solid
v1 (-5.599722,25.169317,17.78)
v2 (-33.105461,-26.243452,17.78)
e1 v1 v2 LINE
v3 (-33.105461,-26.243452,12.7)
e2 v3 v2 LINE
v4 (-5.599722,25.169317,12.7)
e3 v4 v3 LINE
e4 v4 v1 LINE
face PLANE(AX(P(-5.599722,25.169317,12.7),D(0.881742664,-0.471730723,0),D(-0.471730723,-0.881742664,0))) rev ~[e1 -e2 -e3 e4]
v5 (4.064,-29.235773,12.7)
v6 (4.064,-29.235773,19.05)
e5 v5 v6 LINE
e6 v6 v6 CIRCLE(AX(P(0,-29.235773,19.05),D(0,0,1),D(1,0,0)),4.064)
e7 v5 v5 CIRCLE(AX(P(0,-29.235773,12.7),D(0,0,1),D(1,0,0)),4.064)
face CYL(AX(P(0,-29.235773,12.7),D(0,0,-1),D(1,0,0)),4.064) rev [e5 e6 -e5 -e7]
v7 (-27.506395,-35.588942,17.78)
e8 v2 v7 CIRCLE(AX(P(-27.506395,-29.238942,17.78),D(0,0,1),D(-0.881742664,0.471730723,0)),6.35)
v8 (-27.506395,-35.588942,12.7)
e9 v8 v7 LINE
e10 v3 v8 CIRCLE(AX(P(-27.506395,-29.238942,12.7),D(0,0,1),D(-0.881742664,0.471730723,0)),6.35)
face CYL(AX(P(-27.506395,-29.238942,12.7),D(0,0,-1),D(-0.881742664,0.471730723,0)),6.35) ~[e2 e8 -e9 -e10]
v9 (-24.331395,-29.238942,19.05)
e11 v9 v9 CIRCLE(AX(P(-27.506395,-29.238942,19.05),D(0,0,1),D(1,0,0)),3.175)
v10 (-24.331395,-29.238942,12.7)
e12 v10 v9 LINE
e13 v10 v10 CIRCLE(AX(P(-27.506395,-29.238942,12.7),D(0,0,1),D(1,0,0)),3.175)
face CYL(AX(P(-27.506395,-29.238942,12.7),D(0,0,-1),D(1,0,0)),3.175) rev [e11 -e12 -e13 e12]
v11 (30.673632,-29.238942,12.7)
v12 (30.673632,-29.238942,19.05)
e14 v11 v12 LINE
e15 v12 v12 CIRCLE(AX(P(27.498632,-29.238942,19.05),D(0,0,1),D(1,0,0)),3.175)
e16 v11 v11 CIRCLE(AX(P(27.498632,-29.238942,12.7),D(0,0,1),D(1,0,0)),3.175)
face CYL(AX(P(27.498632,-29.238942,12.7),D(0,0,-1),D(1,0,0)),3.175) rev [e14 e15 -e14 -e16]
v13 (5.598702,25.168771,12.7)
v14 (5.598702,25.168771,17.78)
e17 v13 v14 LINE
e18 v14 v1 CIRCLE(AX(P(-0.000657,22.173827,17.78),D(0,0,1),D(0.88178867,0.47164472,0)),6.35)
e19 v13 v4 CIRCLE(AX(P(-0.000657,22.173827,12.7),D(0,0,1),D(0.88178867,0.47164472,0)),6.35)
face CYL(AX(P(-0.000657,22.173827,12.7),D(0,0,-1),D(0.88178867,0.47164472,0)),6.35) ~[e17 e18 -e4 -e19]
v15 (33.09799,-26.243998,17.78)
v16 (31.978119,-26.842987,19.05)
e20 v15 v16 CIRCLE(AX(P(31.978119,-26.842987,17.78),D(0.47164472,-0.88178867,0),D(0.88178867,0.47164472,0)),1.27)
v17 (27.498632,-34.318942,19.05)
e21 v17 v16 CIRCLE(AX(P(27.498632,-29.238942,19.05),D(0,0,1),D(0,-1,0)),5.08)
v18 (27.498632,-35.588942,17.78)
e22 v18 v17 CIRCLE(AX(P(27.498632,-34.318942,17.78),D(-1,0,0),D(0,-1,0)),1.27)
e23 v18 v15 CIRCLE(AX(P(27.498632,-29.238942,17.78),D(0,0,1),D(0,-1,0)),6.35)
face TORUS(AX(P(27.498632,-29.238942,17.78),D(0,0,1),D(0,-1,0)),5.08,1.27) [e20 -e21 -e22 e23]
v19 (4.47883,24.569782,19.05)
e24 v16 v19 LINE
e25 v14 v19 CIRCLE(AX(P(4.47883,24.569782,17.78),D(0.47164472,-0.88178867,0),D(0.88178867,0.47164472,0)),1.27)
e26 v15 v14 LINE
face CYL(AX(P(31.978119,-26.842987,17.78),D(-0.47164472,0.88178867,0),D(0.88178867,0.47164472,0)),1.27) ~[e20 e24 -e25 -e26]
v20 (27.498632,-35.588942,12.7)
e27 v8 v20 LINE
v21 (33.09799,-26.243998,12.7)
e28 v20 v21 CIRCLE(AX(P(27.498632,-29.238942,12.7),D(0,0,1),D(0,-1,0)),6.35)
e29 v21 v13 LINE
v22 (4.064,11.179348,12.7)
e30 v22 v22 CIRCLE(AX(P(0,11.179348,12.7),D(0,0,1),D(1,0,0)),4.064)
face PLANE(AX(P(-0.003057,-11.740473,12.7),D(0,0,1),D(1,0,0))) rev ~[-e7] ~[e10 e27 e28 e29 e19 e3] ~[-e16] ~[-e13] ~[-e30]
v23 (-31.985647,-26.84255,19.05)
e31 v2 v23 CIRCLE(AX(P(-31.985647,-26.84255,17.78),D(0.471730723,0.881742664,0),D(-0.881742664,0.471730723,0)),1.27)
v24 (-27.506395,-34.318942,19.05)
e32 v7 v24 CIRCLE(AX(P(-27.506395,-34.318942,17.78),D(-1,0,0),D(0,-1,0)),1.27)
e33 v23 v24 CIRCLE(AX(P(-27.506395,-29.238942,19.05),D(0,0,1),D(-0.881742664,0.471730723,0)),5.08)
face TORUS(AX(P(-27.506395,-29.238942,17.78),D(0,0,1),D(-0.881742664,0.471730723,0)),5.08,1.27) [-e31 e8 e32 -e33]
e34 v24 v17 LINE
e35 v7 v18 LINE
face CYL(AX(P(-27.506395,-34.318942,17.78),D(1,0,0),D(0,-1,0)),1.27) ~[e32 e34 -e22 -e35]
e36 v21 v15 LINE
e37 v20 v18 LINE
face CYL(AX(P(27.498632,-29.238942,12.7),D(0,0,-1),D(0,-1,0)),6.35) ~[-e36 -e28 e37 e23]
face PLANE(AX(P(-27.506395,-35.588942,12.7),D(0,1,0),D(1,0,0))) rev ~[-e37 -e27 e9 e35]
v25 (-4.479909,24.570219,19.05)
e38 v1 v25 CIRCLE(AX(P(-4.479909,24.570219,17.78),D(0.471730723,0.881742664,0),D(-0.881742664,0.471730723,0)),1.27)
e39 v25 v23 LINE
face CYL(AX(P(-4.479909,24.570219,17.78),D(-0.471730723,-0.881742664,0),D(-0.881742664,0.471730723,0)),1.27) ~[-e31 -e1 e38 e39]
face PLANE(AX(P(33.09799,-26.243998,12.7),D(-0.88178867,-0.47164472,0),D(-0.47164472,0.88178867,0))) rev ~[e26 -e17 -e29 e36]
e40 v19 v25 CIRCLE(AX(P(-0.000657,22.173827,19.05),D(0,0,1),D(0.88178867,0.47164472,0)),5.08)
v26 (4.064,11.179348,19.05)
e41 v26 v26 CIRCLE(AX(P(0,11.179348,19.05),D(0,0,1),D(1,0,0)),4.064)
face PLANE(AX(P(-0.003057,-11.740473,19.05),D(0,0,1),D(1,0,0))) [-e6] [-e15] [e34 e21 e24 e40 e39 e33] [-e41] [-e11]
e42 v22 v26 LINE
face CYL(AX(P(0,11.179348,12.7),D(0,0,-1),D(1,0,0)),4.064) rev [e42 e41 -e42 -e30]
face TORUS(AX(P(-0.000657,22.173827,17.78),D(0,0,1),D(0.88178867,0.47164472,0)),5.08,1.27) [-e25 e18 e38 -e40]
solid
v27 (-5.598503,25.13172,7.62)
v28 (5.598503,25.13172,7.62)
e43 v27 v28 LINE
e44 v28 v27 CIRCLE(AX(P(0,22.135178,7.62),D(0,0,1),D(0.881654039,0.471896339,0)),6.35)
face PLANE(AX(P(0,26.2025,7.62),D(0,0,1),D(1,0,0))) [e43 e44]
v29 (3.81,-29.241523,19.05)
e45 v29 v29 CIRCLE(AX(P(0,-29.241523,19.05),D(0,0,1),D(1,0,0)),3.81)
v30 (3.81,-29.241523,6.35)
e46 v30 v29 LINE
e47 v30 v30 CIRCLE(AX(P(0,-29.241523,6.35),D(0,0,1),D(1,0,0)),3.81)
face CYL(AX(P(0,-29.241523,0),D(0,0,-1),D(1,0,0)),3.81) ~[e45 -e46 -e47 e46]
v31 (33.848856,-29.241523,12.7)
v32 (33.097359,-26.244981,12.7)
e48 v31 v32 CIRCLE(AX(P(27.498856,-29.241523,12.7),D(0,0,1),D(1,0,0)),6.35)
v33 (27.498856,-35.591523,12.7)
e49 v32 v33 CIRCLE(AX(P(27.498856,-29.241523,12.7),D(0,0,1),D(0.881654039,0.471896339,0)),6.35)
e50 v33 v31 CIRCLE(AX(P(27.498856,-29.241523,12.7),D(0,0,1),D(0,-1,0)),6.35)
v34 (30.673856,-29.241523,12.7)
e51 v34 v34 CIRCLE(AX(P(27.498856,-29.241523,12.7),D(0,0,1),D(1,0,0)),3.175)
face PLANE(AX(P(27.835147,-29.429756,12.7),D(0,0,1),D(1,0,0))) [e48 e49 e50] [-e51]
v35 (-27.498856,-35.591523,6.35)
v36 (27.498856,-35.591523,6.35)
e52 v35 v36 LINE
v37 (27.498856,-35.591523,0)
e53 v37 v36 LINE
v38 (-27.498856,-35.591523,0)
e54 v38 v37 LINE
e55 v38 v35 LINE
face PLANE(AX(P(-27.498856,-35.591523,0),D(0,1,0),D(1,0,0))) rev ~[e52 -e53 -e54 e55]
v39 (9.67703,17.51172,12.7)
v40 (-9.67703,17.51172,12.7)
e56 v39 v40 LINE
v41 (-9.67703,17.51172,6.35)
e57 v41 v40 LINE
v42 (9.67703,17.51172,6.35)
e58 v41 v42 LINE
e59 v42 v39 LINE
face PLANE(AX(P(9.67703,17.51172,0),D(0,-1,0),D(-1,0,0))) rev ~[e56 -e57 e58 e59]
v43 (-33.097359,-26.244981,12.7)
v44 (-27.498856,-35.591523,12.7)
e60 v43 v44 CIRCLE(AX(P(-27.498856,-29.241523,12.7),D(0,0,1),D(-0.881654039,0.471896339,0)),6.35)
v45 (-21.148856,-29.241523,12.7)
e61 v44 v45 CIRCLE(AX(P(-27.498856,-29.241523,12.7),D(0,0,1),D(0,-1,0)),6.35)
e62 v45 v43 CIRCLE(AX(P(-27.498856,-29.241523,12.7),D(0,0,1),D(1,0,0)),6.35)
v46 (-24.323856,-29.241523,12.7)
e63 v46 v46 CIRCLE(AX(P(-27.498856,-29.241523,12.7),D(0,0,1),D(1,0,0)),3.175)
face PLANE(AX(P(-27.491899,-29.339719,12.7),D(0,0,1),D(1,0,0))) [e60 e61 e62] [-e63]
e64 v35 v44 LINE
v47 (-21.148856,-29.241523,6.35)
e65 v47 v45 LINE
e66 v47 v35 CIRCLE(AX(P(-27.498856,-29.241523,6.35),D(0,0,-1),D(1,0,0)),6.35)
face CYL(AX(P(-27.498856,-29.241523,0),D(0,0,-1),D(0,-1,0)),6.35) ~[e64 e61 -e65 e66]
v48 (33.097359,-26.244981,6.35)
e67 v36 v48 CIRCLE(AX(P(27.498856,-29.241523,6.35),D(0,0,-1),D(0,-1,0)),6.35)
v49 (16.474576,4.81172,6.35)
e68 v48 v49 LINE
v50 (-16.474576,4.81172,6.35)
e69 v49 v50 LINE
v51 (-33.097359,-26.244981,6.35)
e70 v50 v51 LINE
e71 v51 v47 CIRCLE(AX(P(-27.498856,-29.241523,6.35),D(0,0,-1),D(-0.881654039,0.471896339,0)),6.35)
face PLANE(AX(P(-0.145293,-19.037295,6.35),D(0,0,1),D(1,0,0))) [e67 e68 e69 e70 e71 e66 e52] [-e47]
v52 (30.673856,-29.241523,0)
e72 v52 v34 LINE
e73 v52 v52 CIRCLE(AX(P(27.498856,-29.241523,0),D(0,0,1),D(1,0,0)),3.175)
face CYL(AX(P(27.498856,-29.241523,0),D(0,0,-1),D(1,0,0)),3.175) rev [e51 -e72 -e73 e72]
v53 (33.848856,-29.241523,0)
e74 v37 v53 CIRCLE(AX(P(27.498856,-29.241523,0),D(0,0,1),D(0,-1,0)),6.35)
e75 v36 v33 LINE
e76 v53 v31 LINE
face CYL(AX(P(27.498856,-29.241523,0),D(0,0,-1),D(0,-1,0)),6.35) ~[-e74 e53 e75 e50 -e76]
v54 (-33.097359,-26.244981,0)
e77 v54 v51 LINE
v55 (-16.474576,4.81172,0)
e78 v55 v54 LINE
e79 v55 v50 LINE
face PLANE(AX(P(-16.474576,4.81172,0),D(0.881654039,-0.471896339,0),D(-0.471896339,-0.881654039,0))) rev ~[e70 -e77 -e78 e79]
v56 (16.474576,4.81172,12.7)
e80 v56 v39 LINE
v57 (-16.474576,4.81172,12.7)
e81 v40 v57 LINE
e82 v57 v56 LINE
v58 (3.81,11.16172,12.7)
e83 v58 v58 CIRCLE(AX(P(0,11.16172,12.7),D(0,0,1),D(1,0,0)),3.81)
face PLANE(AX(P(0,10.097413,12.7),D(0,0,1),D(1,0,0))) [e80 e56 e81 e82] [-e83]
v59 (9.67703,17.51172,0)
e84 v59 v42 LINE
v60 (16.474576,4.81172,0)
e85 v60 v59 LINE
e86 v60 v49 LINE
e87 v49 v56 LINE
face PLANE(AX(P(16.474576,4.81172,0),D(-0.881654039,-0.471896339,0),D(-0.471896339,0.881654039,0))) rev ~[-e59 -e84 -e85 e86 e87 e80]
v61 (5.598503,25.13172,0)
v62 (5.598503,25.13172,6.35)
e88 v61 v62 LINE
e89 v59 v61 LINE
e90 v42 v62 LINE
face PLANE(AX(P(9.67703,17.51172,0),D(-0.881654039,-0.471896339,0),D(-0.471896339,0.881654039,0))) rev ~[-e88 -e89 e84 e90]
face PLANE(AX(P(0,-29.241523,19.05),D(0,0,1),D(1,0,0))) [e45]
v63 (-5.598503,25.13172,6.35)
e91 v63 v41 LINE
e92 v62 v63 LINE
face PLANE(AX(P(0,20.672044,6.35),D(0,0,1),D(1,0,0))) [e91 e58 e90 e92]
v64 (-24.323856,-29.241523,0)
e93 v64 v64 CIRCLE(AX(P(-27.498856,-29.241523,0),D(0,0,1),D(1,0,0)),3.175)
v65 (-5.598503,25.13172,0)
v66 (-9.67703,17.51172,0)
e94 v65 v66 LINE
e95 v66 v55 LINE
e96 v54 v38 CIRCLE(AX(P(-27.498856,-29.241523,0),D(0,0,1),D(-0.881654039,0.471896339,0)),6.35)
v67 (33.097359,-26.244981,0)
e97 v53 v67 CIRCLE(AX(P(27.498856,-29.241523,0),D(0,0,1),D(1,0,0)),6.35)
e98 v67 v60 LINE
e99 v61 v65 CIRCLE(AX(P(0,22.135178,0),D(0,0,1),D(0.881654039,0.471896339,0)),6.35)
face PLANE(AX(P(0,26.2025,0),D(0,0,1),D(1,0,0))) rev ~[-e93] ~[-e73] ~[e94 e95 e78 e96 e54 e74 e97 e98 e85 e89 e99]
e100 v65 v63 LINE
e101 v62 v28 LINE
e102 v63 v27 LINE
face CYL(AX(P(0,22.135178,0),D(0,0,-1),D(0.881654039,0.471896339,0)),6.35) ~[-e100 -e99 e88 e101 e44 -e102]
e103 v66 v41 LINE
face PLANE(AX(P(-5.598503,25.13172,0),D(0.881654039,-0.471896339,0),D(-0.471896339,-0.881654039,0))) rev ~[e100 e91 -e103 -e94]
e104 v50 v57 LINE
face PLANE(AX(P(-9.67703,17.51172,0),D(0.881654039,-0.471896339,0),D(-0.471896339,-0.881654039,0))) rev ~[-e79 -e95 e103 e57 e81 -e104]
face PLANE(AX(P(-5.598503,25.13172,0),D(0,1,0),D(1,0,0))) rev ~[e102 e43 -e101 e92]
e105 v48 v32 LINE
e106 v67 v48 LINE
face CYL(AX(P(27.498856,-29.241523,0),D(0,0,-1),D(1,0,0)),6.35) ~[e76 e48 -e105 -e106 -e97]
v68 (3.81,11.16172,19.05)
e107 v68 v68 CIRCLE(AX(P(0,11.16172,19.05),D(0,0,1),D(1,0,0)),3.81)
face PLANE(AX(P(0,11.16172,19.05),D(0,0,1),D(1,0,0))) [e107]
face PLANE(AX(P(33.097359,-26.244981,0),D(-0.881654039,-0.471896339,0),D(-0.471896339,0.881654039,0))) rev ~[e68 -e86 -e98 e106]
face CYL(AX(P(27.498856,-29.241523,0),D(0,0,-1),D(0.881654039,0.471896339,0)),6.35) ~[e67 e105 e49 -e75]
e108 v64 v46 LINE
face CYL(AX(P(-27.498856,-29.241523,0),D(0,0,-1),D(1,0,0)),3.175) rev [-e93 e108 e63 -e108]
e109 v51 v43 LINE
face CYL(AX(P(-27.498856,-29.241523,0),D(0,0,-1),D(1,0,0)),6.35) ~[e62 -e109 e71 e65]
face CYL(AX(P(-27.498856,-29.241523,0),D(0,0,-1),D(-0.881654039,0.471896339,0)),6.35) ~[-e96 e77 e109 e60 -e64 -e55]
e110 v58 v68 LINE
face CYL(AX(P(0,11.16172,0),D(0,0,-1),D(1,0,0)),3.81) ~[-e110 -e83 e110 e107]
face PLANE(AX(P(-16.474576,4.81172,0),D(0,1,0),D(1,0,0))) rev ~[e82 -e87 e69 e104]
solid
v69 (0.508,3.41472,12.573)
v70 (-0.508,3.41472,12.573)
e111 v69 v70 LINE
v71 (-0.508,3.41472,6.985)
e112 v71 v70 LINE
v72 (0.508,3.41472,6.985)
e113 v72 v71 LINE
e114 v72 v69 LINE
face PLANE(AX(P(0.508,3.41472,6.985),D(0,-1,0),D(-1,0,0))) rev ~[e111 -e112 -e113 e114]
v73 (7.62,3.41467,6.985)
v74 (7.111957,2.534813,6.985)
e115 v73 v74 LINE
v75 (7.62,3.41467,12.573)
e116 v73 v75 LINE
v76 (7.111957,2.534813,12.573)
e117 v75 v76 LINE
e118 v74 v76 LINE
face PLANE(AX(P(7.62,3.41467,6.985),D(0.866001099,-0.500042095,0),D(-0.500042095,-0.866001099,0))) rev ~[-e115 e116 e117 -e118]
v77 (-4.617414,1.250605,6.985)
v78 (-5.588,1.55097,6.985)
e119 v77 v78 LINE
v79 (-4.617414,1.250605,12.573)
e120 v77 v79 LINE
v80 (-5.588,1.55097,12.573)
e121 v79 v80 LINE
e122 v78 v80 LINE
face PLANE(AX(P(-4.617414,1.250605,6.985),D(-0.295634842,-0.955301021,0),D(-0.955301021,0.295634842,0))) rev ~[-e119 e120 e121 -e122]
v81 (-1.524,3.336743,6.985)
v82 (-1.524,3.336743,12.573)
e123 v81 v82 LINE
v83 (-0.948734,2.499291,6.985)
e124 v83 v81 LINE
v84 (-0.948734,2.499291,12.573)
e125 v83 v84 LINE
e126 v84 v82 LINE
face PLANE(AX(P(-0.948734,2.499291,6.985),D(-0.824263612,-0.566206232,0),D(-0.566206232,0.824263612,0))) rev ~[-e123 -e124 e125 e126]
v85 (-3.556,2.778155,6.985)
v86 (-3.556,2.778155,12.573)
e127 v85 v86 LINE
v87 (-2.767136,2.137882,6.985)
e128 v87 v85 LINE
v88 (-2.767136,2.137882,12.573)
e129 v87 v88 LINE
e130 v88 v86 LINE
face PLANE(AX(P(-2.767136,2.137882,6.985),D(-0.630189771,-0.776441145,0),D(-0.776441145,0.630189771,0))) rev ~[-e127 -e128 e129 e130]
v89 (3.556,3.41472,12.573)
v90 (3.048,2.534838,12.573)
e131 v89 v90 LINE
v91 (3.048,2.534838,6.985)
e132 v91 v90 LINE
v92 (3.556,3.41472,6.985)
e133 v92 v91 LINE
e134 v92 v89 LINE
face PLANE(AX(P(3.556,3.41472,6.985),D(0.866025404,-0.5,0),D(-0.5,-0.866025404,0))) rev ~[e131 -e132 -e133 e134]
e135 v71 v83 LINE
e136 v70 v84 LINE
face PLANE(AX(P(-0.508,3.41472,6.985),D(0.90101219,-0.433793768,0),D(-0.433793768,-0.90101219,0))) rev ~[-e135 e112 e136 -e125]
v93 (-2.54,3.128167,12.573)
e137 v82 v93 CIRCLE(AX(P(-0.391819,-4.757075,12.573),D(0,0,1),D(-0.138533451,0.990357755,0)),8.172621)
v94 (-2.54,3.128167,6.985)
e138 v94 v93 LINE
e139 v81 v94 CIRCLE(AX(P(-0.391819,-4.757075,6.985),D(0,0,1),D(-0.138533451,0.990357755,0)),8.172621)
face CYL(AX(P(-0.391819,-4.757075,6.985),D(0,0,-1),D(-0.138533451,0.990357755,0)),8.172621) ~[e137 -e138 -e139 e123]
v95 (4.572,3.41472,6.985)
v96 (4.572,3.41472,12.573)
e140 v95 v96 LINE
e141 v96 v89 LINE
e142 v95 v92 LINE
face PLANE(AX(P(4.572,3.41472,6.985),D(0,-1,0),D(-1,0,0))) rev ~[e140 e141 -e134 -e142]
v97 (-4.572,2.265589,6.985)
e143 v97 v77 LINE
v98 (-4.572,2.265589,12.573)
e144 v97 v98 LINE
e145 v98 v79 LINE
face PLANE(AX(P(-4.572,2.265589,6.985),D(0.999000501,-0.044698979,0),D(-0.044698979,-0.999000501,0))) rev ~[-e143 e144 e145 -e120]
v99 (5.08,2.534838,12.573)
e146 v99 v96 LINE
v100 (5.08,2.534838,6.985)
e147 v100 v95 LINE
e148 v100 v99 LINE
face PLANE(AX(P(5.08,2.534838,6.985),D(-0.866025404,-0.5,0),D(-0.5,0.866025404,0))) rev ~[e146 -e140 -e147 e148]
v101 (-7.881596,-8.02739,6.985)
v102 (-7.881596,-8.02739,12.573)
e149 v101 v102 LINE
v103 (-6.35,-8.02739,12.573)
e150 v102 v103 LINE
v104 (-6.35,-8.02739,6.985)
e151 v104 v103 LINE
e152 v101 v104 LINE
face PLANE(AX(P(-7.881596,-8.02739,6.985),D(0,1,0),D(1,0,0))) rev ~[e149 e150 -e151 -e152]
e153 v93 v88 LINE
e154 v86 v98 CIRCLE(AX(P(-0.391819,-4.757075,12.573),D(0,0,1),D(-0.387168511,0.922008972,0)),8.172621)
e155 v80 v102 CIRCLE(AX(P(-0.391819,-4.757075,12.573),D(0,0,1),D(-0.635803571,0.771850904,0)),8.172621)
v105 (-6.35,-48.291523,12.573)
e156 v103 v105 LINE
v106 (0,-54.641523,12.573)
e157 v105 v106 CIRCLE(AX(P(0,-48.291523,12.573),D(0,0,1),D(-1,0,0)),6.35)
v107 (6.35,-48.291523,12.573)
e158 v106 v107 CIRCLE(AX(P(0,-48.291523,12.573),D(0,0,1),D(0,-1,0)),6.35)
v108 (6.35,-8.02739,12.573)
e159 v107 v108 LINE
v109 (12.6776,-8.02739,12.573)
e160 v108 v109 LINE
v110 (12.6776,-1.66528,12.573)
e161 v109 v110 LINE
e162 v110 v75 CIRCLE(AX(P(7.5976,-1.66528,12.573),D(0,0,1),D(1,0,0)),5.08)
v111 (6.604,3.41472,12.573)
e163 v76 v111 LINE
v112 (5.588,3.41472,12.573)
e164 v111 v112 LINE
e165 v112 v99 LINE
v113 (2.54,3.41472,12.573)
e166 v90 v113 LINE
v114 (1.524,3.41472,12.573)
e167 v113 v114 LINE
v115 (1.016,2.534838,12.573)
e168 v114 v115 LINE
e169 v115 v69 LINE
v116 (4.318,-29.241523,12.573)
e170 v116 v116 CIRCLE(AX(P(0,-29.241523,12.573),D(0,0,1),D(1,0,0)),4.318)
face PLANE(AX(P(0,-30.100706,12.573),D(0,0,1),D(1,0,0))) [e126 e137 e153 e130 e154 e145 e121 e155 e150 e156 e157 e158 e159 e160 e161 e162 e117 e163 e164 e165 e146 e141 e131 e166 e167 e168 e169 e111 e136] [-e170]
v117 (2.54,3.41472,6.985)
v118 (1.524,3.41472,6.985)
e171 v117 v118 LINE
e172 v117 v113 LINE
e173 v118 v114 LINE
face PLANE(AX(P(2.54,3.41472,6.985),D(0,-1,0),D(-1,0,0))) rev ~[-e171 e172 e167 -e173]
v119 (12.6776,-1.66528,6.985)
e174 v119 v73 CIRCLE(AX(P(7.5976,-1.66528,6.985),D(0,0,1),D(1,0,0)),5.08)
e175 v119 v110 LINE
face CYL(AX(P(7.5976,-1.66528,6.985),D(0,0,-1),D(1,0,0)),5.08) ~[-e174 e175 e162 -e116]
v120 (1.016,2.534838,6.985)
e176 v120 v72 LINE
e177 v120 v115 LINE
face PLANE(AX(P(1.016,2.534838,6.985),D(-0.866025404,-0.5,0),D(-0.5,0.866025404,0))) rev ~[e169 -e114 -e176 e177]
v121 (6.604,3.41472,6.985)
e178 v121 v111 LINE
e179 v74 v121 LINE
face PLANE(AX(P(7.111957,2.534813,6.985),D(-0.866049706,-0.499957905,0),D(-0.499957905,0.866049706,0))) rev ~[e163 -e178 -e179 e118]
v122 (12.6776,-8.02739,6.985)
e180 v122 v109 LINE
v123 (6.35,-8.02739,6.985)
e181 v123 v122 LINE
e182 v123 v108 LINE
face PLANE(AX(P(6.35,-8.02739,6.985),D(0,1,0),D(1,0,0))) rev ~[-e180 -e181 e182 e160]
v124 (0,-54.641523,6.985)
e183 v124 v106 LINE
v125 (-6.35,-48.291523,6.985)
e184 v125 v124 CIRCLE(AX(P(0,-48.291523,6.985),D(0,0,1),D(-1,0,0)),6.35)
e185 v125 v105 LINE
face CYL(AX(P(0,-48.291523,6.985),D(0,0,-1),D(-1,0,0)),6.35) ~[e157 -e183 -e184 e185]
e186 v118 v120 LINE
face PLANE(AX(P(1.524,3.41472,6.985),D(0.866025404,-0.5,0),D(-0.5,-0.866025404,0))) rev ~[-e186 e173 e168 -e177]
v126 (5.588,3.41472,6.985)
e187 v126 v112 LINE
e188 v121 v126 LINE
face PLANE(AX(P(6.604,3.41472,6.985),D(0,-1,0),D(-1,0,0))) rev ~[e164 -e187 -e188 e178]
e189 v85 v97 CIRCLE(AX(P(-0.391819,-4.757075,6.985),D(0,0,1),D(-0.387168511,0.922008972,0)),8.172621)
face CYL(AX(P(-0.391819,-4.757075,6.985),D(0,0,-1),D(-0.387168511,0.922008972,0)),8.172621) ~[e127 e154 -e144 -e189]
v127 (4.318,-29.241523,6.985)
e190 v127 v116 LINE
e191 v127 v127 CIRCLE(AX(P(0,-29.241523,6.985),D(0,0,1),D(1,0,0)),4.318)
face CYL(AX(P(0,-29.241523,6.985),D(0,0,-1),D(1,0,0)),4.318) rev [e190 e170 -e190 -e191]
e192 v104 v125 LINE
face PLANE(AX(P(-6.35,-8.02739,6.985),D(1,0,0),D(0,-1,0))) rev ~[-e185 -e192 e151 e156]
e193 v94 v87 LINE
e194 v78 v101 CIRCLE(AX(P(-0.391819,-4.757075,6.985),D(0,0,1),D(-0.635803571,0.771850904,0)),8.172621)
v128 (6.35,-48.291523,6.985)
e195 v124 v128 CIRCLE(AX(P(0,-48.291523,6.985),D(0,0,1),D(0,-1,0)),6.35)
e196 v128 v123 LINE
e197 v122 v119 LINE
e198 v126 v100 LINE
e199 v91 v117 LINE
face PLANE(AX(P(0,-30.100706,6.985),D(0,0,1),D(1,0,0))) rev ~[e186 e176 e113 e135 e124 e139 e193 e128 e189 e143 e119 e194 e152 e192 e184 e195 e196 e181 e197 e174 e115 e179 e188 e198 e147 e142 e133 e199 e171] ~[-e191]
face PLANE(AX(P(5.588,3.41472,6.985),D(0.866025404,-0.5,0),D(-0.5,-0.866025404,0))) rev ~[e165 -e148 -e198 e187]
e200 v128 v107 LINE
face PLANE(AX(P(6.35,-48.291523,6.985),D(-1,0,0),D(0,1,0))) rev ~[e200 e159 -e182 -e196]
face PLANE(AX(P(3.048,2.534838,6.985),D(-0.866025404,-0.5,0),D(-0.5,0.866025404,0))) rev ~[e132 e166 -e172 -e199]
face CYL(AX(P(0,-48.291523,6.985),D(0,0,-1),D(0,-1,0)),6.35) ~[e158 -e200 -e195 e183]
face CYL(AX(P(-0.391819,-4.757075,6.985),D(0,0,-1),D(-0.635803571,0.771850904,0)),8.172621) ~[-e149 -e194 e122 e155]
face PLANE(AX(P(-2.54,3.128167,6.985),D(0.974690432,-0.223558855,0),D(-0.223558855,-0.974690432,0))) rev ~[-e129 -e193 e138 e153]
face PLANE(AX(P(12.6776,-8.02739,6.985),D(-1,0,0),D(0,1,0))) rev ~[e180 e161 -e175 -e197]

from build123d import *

# Parameters (mm, degrees)
F0_R      = 3.81
F1_DEPTH  = 6.35
F0_R_2    = 3.175
F2_DEPTH  = 12.7
F3_DEPTH  = 19.05
F4_DEPTH  = 7.62
F7_START  = 6.35
F6_R      = 3.175
F6_R_2    = 4.064
F7_DEPTH  = 6.35
F8_R      = 1.27
F10_START = 0.635
F9_R      = 4.318
F10_DEPTH = 5.588


# Not quite as in the source:
# - a feature names something its author has since deleted; it is built from what else it names


with BuildPart() as f1:
    # F0 (on Top) → F1 (new body)
    with BuildSketch(Plane.XY):
        with BuildLine():
            Line((-27.4988556353, -35.5915231094), (27.4988556353, -35.5915231094))
            ThreePointArc((27.4988556353, -35.5915231094), (22.0513543675, -25.9785137718), (33.0973587859, -26.2449813572))
            Line((33.0973587859, -26.2449813572), (16.4745760518, 4.811719736))
            Line((16.4745760518, 4.811719736), (-16.4745760518, 4.811719736))
            Line((-16.4745760518, 4.811719736), (-33.0973587859, -26.2449813572))
            ThreePointArc((-33.0973587859, -26.2449813572), (-25.954186578, -23.0822619927), (-21.1488556353, -29.2415231094))
            ThreePointArc((-21.1488556353, -29.2415231094), (-23.0087275748, -33.7316511699), (-27.4988556353, -35.5915231094))
        make_face()
        with Locations((0, -29.2415231094)):
            Circle(F0_R, mode=Mode.SUBTRACT)
    extrude(amount=F1_DEPTH)



with BuildPart() as f1b:
    # F0 (on Top) → F1, piece 2 (new body)
    with BuildSketch(Plane.XY):
        Polygon((-9.6770304886, 17.511719736), (9.6770304886, 17.511719736), (5.5985031506, 25.131719736), (-5.5985031506, 25.131719736), align=None)
    extrude(amount=F1_DEPTH)


with BuildPart() as f1_1:
    add(f1.part)

    add(f1b.part)  # F2 merges F1b
    # F0 (on Top) → F2 (join)
    with BuildSketch(Plane.XY):
        Polygon((-16.4745760518, 4.811719736), (16.4745760518, 4.811719736), (9.6770304886, 17.511719736), (-9.6770304886, 17.511719736), align=None)
        with Locations((0, 11.161719736)):
            Circle(F0_R, mode=Mode.SUBTRACT)
        with BuildLine():
            ThreePointArc((-33.0973587859, -26.2449813572), (-32.9463569031, -32.5045324469), (-27.4988556353, -35.5915231094))
            ThreePointArc((-27.4988556353, -35.5915231094), (-23.0087275748, -33.7316511699), (-21.1488556353, -29.2415231094))
            ThreePointArc((-21.1488556353, -29.2415231094), (-25.954186578, -23.0822619927), (-33.0973587859, -26.2449813572))
        make_face()
        with Locations((-27.4988556353, -29.2415231094)):
            Circle(F0_R_2, mode=Mode.SUBTRACT)
        with BuildLine():
            ThreePointArc((33.0973587859, -26.2449813572), (22.0513543675, -25.9785137718), (27.4988556353, -35.5915231094))
            ThreePointArc((27.4988556353, -35.5915231094), (31.9889836958, -33.7316511699), (33.8488556353, -29.2415231094))
            ThreePointArc((33.8488556353, -29.2415231094), (33.658116752, -27.696854052), (33.0973587859, -26.2449813572))
        make_face()
        with Locations((27.4988556353, -29.2415231094)):
            Circle(F0_R_2, mode=Mode.SUBTRACT)
    extrude(amount=F2_DEPTH)

    # F0 (on Top) → F3 (join)
    with BuildSketch(Plane.XY):
        with Locations((0, -29.2415231094)):
            Circle(F0_R)
        with Locations((0, 11.161719736)):
            Circle(F0_R)
    extrude(amount=F3_DEPTH)

    # F0 (on Top) → F4 (join)
    with BuildSketch(Plane.XY):
        with BuildLine():
            Line((-5.5985031506, 25.131719736), (5.5985031506, 25.131719736))
            ThreePointArc((5.5985031506, 25.131719736), (0, 28.4851779838), (-5.5985031506, 25.131719736))
        make_face()
    extrude(amount=F4_DEPTH)


with BuildPart() as f7:
    # F6 (on offset) → F7 (new body)
    with BuildSketch(Plane.XY.offset(6.35).offset(F7_START)):
        with BuildLine():
            ThreePointArc((-33.1054605215, -26.2434523784), (-32.9535893922, -32.5024634142), (-27.5063946063, -35.5889424682))
            Line((-27.5063946063, -35.5889424682), (27.4986321348, -35.5889424682))
            ThreePointArc((27.4986321348, -35.5889424682), (32.9456677616, -32.5027290543), (33.0979901862, -26.2439984934))
            Line((33.0979901862, -26.2439984934), (5.5987015339, 25.1687706999))
            ThreePointArc((5.5987015339, 25.1687706999), (-0.0003468463, 28.5238267175), (-5.5997224327, 25.1693168148))
            Line((-5.5997224327, 25.1693168148), (-33.1054605215, -26.2434523784))
        make_face()
        with Locations((-27.5063946063, -29.2389424682)):
            Circle(F6_R, mode=Mode.SUBTRACT)
        with Locations((0, -29.2357727885)):
            Circle(F6_R_2, mode=Mode.SUBTRACT)
        with Locations((27.4986321348, -29.2389424682)):
            Circle(F6_R, mode=Mode.SUBTRACT)
        with Locations((0, 11.1793484539)):
            Circle(F6_R_2, mode=Mode.SUBTRACT)
    extrude(amount=F7_DEPTH)

    # F8
    f8_edges = [f7.edges().sort_by_distance(p)[0] for p in [
        (-0.003881, -35.588942, 19.05),
        (-19.352591, -0.537068, 19.05),
        (-32.953589, -32.502463, 19.05),
        (32.945668, -32.502729, 19.05),
        (19.348346, -0.537614, 19.05),
        (-0.000347, 28.523827, 19.05),
    ]]
    fillet(f8_edges, radius=F8_R)


with BuildPart() as f10:
    # F9 (on offset) → F10 (new body)
    with BuildSketch(Plane.XY.offset(6.35).offset(F10_START)):
        with BuildLine():
            Line((6.35, -8.0273897686), (-6.35, -8.0273897686))
            Line((-6.35, -8.0273897686), (-6.35, -48.2915231094))
            ThreePointArc((-6.35, -48.2915231094), (-4.4901280605, -52.7816511699), (0, -54.6415231094))
            ThreePointArc((0, -54.6415231094), (4.4901280605, -52.7816511699), (6.35, -48.2915231094))
            Line((6.35, -48.2915231094), (6.35, -8.0273897686))
        make_face()
        with Locations((0, -29.2415231094)):
            Circle(F9_R, mode=Mode.SUBTRACT)
        with BuildLine():
            ThreePointArc((-5.588, 1.5509696046), (-8.3397511172, -2.853894355), (-7.8815962098, -8.0273897686))
            Line((-7.8815962098, -8.0273897686), (-6.35, -8.0273897686))
            Line((-6.35, -8.0273897686), (6.35, -8.0273897686))
            Line((6.35, -8.0273897686), (7.1399843125, -8.0273897686))
            Line((7.1399843125, -8.0273897686), (12.6776003079, -8.0273897686))
            Line((12.6776003079, -8.0273897686), (12.6776003079, -1.665280264))
            ThreePointArc((12.6776003079, -1.665280264), (11.1976135326, 1.918893948), (7.62, 3.4146703512))
            Line((7.62, 3.4146703512), (7.1119572316, 2.5348132347))
            Line((7.1119572316, 2.5348132347), (6.604, 3.414719736))
            Line((6.604, 3.414719736), (5.588, 3.414719736))
            Line((5.588, 3.414719736), (5.08, 2.5348379257))
            Line((5.08, 2.5348379257), (4.572, 3.414719736))
            Line((4.572, 3.414719736), (3.556, 3.414719736))
            Line((3.556, 3.414719736), (3.048, 2.5348379257))
            Line((3.048, 2.5348379257), (2.54, 3.414719736))
            Line((2.54, 3.414719736), (1.524, 3.414719736))
            Line((1.524, 3.414719736), (1.016, 2.5348379257))
            Line((1.016, 2.5348379257), (0.508, 3.414719736))
            Line((0.508, 3.414719736), (0, 3.414719736))
            Line((0, 3.414719736), (-0.508, 3.414719736))
            Line((-0.508, 3.414719736), (-0.9487344679, 2.4992913505))
            Line((-0.9487344679, 2.4992913505), (-1.524, 3.3367431805))
            ThreePointArc((-1.524, 3.3367431805), (-2.0353121388, 3.248589027), (-2.54, 3.1281671814))
            Line((-2.54, 3.1281671814), (-2.7671357963, 2.1378817023))
            Line((-2.7671357963, 2.1378817023), (-3.556, 2.7781545099))
            ThreePointArc((-3.556, 2.7781545099), (-4.0729321621, 2.5395770195), (-4.572, 2.2655891141))
            Line((-4.572, 2.2655891141), (-4.617414163, 1.250604605))
            Line((-4.617414163, 1.250604605), (-5.588, 1.5509696046))
        make_face()
    extrude(amount=F10_DEPTH)


solid = Compound([f1_1.part, f7.part, f10.part])
